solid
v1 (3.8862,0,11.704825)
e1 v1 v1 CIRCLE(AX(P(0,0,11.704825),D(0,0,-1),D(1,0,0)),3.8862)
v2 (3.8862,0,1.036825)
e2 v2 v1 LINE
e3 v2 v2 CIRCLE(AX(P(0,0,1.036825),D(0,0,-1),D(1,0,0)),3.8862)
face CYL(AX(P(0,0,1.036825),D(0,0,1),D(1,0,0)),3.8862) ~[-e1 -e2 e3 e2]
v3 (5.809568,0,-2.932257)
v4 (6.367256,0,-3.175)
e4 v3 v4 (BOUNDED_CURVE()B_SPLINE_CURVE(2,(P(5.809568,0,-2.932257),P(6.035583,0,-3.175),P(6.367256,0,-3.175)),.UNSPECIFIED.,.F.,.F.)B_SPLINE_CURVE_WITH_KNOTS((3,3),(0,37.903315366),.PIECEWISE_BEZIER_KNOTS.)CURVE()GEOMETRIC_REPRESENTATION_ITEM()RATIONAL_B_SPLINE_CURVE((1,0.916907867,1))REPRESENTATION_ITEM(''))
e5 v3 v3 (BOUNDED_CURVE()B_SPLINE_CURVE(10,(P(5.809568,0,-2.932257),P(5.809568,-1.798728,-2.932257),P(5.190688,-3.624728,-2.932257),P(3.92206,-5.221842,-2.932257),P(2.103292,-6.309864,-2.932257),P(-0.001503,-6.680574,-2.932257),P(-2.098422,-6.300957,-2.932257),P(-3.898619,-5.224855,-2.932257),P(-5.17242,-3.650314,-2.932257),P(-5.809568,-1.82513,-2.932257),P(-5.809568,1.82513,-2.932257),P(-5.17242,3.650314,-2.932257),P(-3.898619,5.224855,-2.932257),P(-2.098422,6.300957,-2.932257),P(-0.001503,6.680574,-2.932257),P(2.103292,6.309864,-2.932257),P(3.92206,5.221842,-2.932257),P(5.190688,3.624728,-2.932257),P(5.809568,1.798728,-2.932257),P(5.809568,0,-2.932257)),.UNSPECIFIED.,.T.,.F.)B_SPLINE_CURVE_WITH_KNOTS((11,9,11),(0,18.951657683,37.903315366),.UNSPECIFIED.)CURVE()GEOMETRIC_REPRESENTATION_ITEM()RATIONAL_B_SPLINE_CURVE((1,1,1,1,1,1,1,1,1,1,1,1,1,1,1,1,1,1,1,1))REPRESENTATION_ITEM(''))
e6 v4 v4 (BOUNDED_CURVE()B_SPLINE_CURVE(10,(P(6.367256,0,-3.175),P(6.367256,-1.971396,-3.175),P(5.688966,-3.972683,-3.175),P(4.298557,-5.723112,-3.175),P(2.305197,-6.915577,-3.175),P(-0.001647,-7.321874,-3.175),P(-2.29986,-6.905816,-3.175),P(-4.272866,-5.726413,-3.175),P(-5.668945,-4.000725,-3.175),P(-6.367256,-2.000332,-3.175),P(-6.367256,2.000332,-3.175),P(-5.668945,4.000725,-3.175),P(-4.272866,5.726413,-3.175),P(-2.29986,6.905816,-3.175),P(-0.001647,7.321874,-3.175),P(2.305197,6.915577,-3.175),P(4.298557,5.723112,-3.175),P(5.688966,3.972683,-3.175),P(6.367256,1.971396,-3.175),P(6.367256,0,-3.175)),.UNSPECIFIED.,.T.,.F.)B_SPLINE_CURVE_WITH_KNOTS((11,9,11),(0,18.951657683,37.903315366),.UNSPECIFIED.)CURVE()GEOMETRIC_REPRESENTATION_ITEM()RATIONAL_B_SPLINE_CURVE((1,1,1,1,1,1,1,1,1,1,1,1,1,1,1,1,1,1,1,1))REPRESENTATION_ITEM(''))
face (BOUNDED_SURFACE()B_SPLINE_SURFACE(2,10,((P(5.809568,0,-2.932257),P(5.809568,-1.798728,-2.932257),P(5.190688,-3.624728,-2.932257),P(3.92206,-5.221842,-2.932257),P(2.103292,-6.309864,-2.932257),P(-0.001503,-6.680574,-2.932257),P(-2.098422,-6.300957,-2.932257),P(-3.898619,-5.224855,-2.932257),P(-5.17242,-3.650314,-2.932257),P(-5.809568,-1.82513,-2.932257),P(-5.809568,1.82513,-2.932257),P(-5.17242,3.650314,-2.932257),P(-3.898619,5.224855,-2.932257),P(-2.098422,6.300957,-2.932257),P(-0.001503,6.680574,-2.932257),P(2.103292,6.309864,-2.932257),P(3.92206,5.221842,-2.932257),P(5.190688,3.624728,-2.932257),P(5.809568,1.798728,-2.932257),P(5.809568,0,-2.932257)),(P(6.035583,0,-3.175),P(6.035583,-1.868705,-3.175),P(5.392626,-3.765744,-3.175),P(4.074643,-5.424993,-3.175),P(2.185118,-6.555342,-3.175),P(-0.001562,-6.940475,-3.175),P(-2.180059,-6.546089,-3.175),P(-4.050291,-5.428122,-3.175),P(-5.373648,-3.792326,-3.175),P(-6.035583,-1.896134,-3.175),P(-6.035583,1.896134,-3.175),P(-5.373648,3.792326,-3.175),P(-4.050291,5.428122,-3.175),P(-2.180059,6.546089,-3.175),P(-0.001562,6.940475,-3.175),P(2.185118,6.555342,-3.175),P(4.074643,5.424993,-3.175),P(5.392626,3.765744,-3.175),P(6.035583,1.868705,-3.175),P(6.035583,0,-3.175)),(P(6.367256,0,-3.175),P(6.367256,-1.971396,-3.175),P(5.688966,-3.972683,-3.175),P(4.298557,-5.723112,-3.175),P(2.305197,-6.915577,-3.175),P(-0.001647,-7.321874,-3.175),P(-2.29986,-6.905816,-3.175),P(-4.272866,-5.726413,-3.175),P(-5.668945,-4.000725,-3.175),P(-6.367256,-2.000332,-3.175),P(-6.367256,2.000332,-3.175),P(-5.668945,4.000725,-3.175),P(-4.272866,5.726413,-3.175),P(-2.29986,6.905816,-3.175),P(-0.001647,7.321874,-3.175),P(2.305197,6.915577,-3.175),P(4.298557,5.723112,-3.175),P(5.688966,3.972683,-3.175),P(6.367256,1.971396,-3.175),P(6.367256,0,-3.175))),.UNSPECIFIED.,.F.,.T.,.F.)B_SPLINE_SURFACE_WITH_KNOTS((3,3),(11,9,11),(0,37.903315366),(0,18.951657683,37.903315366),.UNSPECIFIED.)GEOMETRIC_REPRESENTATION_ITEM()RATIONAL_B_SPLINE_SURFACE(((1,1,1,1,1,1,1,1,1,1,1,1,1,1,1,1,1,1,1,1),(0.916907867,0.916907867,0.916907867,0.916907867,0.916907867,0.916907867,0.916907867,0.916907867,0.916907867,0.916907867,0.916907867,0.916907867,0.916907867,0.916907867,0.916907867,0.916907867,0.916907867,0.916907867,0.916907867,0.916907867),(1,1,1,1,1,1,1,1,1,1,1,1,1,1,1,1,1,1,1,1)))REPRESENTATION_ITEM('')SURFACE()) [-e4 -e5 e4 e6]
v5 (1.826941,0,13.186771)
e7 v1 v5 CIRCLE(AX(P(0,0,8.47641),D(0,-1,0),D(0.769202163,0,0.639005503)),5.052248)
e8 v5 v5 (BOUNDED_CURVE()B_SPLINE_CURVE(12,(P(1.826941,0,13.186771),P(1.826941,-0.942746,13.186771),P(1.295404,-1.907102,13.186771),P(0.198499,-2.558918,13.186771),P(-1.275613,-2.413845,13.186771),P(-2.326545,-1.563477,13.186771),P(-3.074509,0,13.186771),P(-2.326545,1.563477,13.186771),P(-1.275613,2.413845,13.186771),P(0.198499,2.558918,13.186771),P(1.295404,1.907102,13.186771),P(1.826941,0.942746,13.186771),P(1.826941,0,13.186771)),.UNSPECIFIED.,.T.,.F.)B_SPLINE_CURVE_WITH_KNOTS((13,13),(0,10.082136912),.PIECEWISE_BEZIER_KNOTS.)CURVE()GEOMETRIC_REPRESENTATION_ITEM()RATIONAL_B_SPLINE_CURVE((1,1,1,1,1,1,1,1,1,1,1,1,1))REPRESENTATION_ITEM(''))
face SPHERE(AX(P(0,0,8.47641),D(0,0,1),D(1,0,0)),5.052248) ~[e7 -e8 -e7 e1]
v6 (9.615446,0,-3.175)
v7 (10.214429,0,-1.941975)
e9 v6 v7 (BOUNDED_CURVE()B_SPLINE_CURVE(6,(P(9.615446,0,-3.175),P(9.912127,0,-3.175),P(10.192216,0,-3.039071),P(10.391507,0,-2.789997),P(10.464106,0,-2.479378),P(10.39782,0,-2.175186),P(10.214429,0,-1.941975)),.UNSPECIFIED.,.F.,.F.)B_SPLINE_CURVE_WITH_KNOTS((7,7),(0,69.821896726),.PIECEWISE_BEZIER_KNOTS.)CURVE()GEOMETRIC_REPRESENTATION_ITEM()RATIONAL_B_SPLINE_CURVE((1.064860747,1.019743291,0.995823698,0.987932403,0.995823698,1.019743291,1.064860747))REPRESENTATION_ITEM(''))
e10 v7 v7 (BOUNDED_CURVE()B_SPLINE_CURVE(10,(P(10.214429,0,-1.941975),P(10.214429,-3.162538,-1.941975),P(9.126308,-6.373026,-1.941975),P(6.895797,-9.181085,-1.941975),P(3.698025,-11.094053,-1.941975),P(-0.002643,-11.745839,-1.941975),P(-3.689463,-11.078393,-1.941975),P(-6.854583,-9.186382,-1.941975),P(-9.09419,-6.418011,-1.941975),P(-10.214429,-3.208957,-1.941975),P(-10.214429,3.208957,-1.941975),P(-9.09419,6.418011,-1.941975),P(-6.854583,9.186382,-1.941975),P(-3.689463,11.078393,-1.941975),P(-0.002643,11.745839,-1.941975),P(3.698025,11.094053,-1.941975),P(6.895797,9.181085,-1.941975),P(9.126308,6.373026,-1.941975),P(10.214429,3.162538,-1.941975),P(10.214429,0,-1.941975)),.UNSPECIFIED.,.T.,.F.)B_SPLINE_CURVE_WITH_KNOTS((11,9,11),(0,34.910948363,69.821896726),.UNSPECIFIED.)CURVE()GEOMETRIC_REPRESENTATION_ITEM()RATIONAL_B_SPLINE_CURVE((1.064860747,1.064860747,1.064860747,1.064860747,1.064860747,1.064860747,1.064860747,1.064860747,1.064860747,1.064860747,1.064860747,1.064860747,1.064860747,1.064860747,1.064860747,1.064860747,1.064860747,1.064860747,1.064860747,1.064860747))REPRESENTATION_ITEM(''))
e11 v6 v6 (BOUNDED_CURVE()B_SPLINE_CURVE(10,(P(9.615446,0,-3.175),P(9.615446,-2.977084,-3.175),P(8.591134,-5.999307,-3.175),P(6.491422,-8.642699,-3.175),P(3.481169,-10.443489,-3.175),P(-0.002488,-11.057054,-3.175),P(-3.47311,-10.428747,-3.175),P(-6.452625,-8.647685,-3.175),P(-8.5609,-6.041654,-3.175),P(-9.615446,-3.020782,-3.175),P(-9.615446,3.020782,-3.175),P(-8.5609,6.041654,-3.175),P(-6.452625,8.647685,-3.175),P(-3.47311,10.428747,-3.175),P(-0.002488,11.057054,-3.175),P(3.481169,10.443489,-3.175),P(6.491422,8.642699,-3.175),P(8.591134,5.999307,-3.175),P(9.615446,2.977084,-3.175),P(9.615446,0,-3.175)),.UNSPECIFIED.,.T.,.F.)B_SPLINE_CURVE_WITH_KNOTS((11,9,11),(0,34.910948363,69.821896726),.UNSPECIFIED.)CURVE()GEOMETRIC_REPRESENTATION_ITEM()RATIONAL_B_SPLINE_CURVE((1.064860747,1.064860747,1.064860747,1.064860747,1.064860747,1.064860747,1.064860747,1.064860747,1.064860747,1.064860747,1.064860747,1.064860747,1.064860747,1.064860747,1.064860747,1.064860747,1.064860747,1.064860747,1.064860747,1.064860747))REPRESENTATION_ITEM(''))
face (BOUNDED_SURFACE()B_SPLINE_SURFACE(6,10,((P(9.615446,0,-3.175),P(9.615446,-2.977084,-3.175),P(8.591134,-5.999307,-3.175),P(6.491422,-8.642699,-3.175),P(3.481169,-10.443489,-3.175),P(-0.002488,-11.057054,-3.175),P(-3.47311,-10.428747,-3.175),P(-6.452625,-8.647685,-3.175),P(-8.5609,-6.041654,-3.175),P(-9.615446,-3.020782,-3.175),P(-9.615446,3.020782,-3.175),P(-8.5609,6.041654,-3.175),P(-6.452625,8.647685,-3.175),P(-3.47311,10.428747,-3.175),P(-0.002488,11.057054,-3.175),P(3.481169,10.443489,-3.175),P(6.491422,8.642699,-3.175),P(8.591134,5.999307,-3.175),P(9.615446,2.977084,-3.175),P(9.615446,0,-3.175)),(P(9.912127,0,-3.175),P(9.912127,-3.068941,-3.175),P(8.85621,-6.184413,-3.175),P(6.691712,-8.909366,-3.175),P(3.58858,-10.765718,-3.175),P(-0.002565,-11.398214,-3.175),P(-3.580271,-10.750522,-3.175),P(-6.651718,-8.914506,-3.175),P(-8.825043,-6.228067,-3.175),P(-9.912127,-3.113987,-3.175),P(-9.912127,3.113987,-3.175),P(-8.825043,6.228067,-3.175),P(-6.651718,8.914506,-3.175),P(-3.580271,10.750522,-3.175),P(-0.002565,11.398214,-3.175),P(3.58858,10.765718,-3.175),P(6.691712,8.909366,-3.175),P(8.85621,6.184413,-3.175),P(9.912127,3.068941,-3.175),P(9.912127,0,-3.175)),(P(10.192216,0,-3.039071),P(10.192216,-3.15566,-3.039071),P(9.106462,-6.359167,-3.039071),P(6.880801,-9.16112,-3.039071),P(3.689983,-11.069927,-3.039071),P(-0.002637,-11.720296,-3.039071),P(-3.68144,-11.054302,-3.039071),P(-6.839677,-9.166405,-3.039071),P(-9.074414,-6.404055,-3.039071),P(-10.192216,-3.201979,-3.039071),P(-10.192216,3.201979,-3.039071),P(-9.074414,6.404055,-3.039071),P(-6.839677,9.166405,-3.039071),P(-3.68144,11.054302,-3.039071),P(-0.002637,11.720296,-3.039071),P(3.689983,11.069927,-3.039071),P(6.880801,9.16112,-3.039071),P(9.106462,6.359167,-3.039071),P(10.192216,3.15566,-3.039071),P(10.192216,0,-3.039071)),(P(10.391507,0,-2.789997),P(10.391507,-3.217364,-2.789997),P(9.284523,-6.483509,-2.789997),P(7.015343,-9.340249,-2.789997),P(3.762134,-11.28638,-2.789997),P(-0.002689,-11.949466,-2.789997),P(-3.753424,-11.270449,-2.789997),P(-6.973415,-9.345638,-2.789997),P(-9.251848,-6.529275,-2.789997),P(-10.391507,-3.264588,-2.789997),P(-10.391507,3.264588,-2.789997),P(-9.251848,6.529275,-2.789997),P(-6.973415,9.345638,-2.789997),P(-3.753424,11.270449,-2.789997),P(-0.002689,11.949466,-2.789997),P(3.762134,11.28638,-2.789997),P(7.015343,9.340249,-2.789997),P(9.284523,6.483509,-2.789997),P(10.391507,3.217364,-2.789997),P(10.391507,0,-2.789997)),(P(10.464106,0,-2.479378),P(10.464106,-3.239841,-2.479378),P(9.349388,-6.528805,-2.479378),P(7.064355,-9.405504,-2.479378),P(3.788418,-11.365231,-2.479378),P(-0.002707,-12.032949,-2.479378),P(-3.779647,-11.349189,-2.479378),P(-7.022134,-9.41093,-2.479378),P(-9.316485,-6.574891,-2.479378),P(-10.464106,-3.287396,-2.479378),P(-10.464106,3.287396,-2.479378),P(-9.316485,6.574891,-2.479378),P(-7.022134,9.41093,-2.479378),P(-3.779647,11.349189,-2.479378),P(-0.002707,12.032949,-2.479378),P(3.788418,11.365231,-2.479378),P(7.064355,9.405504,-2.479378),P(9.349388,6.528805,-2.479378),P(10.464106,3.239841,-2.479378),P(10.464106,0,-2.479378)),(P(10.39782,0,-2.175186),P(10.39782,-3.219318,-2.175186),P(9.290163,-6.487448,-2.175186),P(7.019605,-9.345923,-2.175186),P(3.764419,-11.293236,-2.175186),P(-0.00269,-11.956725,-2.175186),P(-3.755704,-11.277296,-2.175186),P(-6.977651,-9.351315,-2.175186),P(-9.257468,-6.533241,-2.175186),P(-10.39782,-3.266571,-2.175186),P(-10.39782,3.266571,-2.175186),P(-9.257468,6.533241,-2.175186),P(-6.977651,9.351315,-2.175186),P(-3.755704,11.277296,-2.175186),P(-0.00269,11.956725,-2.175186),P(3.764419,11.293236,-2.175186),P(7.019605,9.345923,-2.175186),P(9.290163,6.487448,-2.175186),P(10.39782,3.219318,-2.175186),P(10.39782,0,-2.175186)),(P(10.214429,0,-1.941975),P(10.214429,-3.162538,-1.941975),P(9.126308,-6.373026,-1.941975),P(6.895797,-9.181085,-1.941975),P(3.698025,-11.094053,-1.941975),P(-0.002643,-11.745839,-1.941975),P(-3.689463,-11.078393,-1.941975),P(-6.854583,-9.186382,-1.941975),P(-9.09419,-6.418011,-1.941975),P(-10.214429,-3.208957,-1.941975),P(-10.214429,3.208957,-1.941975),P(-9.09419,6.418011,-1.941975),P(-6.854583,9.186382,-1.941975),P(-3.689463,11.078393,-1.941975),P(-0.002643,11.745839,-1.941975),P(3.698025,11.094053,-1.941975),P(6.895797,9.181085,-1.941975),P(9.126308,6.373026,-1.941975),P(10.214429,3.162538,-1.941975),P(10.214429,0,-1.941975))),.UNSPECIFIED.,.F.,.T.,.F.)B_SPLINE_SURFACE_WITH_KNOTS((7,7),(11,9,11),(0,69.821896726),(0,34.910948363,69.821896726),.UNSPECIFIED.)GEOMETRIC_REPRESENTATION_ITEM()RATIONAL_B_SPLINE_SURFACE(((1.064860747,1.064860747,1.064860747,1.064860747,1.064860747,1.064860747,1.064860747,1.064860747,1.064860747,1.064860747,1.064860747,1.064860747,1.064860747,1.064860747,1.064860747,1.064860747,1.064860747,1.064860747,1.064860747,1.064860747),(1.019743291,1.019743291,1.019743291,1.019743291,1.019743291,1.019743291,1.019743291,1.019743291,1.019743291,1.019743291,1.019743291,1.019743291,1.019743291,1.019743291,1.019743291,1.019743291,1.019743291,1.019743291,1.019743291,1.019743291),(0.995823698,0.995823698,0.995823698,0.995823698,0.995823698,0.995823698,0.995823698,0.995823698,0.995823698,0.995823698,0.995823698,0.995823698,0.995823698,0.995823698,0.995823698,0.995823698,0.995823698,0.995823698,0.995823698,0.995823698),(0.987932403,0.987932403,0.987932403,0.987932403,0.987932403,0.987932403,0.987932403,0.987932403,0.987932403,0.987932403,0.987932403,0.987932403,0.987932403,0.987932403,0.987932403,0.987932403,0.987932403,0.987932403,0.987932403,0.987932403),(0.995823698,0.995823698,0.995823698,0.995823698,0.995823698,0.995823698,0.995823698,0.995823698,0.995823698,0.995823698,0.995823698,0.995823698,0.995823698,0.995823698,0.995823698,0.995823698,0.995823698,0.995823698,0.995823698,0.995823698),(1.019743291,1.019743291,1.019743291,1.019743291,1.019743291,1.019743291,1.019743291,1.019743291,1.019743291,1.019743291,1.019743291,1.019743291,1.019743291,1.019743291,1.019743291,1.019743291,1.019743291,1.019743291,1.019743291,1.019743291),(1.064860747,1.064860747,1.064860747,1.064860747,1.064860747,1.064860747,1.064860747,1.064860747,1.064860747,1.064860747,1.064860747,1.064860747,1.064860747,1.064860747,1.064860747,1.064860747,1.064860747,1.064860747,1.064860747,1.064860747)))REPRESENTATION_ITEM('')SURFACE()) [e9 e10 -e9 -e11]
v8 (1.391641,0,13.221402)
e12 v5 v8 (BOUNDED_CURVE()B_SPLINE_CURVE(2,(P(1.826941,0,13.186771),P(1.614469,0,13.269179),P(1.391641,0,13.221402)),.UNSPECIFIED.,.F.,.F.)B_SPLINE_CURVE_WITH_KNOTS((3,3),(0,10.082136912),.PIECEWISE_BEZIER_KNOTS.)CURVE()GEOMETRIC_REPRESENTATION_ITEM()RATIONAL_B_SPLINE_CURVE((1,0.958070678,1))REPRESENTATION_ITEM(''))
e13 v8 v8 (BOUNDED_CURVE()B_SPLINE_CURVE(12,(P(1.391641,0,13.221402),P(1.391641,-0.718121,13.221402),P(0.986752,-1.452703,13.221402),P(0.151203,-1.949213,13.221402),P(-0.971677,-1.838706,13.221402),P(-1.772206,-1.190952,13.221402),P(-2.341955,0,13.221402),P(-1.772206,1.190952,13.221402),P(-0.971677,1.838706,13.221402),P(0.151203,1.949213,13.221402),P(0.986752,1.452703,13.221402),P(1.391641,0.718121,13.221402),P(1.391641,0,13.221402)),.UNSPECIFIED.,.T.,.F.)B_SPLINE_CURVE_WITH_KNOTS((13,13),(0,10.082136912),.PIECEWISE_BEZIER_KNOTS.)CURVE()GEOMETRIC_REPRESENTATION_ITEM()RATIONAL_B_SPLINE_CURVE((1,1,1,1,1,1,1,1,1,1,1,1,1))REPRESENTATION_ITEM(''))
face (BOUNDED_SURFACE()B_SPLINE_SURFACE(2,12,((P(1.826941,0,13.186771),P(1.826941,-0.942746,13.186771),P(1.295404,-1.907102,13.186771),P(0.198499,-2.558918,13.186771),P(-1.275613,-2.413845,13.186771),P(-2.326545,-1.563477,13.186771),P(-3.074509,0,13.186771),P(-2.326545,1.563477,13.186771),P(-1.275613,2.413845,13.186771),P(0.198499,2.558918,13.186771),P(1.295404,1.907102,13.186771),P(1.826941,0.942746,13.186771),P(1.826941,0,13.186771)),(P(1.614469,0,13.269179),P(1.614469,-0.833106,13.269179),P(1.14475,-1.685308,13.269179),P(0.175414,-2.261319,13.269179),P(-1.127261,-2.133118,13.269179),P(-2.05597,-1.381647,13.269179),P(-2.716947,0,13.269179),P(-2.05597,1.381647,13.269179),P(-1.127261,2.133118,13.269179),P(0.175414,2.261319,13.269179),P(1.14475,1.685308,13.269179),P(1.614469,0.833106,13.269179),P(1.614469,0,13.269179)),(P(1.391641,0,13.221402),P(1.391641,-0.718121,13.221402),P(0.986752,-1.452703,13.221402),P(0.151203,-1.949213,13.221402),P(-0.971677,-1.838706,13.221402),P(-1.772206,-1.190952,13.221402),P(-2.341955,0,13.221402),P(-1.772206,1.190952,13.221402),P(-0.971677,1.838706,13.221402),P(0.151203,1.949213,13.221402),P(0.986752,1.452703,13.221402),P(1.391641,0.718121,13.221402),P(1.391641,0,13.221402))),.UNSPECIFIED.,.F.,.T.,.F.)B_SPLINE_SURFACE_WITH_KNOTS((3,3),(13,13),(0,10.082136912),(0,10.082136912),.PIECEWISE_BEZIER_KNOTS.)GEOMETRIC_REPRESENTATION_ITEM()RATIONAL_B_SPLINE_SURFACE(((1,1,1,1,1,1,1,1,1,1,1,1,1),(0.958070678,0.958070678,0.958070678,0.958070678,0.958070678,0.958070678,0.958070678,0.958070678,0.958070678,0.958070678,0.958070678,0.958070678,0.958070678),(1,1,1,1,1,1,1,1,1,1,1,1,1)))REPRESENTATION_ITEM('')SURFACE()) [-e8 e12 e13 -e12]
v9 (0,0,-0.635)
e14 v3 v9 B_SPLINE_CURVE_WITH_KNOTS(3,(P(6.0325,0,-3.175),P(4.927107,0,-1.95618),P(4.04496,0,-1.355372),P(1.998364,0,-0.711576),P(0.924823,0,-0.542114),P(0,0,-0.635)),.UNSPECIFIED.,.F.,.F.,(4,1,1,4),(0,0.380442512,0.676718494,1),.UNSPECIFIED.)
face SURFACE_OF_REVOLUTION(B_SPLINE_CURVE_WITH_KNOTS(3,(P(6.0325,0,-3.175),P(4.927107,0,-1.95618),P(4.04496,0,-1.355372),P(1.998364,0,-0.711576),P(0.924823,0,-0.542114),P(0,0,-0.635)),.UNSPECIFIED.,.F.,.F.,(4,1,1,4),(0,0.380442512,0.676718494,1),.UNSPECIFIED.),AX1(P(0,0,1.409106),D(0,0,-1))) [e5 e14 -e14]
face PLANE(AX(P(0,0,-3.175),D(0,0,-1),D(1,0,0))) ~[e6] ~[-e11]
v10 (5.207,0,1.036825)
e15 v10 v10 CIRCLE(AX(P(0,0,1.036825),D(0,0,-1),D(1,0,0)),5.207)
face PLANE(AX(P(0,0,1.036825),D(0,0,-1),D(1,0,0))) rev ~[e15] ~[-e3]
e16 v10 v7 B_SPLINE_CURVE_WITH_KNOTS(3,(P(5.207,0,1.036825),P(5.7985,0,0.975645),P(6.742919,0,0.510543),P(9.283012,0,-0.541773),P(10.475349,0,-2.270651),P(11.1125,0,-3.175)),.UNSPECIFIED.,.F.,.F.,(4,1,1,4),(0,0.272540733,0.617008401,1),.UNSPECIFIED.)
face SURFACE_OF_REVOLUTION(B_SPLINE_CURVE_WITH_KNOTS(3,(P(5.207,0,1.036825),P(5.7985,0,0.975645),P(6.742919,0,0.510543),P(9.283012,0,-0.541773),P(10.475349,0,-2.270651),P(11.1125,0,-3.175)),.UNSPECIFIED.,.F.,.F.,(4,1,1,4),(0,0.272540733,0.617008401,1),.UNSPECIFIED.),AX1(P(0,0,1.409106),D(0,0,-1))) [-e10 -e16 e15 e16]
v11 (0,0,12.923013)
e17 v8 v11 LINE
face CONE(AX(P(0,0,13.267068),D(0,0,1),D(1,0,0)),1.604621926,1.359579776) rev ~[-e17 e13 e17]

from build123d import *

# Parameters (mm, degrees)
F3_R = 0.762


# Not quite as in the source:
# - a feature names something its author has since deleted; it is built from what else it names


with BuildPart() as f2:
    # F0 (on Front) → F2 (revolve)
    with BuildSketch(Plane.XZ):
        with BuildLine():
            Line((3.8862, 1.0368246978), (3.8862, 11.7048246978))
            ThreePointArc((3.8862, 11.7048246978), (2.8543707216, 12.645076528), (1.6046219265, 13.2670677765))
            Line((1.6046219265, 13.2670677765), (0, 12.9230134189))
            Line((0, 12.9230134189), (0, -0.635))
            add(Edge.make_bspline(
                [(6.0325, -3.175), (4.927107133, -1.9561804365), (4.0449600812, -1.3553717475), (1.9983640724, -0.7115763161), (0.9248232606, -0.5421136513), (0, -0.635)],
                knots=[0, 0, 0, 0, 0.3804425123, 0.6767184943, 1, 1, 1, 1], degree=3))
            Line((6.0325, -3.175), (11.1125, -3.175))
            add(Edge.make_bspline(
                [(5.207, 1.0368246978), (5.7984997261, 0.975644811), (6.74291899, 0.5105425669), (9.2830121982, -0.5417734643), (10.4753485066, -2.2706511595), (11.1125, -3.175)],
                knots=[0, 0, 0, 0, 0.2725407329, 0.6170084006, 1, 1, 1, 1], degree=3))
            Line((5.207, 1.0368246978), (3.8862, 1.0368246978))
        make_face()
    revolve(axis=Axis((0, 0, 1.4091059566), (0, 0, -1)))

    # F3
    f3_edges = [f2.edges().sort_by_distance(p)[0] for p in [
        (-1.604622, 0, 13.267068),
        (-6.0325, 0, -3.175),
        (-11.1125, 0, -3.175),
    ]]
    fillet(f3_edges, radius=F3_R)


solid = f2.part
